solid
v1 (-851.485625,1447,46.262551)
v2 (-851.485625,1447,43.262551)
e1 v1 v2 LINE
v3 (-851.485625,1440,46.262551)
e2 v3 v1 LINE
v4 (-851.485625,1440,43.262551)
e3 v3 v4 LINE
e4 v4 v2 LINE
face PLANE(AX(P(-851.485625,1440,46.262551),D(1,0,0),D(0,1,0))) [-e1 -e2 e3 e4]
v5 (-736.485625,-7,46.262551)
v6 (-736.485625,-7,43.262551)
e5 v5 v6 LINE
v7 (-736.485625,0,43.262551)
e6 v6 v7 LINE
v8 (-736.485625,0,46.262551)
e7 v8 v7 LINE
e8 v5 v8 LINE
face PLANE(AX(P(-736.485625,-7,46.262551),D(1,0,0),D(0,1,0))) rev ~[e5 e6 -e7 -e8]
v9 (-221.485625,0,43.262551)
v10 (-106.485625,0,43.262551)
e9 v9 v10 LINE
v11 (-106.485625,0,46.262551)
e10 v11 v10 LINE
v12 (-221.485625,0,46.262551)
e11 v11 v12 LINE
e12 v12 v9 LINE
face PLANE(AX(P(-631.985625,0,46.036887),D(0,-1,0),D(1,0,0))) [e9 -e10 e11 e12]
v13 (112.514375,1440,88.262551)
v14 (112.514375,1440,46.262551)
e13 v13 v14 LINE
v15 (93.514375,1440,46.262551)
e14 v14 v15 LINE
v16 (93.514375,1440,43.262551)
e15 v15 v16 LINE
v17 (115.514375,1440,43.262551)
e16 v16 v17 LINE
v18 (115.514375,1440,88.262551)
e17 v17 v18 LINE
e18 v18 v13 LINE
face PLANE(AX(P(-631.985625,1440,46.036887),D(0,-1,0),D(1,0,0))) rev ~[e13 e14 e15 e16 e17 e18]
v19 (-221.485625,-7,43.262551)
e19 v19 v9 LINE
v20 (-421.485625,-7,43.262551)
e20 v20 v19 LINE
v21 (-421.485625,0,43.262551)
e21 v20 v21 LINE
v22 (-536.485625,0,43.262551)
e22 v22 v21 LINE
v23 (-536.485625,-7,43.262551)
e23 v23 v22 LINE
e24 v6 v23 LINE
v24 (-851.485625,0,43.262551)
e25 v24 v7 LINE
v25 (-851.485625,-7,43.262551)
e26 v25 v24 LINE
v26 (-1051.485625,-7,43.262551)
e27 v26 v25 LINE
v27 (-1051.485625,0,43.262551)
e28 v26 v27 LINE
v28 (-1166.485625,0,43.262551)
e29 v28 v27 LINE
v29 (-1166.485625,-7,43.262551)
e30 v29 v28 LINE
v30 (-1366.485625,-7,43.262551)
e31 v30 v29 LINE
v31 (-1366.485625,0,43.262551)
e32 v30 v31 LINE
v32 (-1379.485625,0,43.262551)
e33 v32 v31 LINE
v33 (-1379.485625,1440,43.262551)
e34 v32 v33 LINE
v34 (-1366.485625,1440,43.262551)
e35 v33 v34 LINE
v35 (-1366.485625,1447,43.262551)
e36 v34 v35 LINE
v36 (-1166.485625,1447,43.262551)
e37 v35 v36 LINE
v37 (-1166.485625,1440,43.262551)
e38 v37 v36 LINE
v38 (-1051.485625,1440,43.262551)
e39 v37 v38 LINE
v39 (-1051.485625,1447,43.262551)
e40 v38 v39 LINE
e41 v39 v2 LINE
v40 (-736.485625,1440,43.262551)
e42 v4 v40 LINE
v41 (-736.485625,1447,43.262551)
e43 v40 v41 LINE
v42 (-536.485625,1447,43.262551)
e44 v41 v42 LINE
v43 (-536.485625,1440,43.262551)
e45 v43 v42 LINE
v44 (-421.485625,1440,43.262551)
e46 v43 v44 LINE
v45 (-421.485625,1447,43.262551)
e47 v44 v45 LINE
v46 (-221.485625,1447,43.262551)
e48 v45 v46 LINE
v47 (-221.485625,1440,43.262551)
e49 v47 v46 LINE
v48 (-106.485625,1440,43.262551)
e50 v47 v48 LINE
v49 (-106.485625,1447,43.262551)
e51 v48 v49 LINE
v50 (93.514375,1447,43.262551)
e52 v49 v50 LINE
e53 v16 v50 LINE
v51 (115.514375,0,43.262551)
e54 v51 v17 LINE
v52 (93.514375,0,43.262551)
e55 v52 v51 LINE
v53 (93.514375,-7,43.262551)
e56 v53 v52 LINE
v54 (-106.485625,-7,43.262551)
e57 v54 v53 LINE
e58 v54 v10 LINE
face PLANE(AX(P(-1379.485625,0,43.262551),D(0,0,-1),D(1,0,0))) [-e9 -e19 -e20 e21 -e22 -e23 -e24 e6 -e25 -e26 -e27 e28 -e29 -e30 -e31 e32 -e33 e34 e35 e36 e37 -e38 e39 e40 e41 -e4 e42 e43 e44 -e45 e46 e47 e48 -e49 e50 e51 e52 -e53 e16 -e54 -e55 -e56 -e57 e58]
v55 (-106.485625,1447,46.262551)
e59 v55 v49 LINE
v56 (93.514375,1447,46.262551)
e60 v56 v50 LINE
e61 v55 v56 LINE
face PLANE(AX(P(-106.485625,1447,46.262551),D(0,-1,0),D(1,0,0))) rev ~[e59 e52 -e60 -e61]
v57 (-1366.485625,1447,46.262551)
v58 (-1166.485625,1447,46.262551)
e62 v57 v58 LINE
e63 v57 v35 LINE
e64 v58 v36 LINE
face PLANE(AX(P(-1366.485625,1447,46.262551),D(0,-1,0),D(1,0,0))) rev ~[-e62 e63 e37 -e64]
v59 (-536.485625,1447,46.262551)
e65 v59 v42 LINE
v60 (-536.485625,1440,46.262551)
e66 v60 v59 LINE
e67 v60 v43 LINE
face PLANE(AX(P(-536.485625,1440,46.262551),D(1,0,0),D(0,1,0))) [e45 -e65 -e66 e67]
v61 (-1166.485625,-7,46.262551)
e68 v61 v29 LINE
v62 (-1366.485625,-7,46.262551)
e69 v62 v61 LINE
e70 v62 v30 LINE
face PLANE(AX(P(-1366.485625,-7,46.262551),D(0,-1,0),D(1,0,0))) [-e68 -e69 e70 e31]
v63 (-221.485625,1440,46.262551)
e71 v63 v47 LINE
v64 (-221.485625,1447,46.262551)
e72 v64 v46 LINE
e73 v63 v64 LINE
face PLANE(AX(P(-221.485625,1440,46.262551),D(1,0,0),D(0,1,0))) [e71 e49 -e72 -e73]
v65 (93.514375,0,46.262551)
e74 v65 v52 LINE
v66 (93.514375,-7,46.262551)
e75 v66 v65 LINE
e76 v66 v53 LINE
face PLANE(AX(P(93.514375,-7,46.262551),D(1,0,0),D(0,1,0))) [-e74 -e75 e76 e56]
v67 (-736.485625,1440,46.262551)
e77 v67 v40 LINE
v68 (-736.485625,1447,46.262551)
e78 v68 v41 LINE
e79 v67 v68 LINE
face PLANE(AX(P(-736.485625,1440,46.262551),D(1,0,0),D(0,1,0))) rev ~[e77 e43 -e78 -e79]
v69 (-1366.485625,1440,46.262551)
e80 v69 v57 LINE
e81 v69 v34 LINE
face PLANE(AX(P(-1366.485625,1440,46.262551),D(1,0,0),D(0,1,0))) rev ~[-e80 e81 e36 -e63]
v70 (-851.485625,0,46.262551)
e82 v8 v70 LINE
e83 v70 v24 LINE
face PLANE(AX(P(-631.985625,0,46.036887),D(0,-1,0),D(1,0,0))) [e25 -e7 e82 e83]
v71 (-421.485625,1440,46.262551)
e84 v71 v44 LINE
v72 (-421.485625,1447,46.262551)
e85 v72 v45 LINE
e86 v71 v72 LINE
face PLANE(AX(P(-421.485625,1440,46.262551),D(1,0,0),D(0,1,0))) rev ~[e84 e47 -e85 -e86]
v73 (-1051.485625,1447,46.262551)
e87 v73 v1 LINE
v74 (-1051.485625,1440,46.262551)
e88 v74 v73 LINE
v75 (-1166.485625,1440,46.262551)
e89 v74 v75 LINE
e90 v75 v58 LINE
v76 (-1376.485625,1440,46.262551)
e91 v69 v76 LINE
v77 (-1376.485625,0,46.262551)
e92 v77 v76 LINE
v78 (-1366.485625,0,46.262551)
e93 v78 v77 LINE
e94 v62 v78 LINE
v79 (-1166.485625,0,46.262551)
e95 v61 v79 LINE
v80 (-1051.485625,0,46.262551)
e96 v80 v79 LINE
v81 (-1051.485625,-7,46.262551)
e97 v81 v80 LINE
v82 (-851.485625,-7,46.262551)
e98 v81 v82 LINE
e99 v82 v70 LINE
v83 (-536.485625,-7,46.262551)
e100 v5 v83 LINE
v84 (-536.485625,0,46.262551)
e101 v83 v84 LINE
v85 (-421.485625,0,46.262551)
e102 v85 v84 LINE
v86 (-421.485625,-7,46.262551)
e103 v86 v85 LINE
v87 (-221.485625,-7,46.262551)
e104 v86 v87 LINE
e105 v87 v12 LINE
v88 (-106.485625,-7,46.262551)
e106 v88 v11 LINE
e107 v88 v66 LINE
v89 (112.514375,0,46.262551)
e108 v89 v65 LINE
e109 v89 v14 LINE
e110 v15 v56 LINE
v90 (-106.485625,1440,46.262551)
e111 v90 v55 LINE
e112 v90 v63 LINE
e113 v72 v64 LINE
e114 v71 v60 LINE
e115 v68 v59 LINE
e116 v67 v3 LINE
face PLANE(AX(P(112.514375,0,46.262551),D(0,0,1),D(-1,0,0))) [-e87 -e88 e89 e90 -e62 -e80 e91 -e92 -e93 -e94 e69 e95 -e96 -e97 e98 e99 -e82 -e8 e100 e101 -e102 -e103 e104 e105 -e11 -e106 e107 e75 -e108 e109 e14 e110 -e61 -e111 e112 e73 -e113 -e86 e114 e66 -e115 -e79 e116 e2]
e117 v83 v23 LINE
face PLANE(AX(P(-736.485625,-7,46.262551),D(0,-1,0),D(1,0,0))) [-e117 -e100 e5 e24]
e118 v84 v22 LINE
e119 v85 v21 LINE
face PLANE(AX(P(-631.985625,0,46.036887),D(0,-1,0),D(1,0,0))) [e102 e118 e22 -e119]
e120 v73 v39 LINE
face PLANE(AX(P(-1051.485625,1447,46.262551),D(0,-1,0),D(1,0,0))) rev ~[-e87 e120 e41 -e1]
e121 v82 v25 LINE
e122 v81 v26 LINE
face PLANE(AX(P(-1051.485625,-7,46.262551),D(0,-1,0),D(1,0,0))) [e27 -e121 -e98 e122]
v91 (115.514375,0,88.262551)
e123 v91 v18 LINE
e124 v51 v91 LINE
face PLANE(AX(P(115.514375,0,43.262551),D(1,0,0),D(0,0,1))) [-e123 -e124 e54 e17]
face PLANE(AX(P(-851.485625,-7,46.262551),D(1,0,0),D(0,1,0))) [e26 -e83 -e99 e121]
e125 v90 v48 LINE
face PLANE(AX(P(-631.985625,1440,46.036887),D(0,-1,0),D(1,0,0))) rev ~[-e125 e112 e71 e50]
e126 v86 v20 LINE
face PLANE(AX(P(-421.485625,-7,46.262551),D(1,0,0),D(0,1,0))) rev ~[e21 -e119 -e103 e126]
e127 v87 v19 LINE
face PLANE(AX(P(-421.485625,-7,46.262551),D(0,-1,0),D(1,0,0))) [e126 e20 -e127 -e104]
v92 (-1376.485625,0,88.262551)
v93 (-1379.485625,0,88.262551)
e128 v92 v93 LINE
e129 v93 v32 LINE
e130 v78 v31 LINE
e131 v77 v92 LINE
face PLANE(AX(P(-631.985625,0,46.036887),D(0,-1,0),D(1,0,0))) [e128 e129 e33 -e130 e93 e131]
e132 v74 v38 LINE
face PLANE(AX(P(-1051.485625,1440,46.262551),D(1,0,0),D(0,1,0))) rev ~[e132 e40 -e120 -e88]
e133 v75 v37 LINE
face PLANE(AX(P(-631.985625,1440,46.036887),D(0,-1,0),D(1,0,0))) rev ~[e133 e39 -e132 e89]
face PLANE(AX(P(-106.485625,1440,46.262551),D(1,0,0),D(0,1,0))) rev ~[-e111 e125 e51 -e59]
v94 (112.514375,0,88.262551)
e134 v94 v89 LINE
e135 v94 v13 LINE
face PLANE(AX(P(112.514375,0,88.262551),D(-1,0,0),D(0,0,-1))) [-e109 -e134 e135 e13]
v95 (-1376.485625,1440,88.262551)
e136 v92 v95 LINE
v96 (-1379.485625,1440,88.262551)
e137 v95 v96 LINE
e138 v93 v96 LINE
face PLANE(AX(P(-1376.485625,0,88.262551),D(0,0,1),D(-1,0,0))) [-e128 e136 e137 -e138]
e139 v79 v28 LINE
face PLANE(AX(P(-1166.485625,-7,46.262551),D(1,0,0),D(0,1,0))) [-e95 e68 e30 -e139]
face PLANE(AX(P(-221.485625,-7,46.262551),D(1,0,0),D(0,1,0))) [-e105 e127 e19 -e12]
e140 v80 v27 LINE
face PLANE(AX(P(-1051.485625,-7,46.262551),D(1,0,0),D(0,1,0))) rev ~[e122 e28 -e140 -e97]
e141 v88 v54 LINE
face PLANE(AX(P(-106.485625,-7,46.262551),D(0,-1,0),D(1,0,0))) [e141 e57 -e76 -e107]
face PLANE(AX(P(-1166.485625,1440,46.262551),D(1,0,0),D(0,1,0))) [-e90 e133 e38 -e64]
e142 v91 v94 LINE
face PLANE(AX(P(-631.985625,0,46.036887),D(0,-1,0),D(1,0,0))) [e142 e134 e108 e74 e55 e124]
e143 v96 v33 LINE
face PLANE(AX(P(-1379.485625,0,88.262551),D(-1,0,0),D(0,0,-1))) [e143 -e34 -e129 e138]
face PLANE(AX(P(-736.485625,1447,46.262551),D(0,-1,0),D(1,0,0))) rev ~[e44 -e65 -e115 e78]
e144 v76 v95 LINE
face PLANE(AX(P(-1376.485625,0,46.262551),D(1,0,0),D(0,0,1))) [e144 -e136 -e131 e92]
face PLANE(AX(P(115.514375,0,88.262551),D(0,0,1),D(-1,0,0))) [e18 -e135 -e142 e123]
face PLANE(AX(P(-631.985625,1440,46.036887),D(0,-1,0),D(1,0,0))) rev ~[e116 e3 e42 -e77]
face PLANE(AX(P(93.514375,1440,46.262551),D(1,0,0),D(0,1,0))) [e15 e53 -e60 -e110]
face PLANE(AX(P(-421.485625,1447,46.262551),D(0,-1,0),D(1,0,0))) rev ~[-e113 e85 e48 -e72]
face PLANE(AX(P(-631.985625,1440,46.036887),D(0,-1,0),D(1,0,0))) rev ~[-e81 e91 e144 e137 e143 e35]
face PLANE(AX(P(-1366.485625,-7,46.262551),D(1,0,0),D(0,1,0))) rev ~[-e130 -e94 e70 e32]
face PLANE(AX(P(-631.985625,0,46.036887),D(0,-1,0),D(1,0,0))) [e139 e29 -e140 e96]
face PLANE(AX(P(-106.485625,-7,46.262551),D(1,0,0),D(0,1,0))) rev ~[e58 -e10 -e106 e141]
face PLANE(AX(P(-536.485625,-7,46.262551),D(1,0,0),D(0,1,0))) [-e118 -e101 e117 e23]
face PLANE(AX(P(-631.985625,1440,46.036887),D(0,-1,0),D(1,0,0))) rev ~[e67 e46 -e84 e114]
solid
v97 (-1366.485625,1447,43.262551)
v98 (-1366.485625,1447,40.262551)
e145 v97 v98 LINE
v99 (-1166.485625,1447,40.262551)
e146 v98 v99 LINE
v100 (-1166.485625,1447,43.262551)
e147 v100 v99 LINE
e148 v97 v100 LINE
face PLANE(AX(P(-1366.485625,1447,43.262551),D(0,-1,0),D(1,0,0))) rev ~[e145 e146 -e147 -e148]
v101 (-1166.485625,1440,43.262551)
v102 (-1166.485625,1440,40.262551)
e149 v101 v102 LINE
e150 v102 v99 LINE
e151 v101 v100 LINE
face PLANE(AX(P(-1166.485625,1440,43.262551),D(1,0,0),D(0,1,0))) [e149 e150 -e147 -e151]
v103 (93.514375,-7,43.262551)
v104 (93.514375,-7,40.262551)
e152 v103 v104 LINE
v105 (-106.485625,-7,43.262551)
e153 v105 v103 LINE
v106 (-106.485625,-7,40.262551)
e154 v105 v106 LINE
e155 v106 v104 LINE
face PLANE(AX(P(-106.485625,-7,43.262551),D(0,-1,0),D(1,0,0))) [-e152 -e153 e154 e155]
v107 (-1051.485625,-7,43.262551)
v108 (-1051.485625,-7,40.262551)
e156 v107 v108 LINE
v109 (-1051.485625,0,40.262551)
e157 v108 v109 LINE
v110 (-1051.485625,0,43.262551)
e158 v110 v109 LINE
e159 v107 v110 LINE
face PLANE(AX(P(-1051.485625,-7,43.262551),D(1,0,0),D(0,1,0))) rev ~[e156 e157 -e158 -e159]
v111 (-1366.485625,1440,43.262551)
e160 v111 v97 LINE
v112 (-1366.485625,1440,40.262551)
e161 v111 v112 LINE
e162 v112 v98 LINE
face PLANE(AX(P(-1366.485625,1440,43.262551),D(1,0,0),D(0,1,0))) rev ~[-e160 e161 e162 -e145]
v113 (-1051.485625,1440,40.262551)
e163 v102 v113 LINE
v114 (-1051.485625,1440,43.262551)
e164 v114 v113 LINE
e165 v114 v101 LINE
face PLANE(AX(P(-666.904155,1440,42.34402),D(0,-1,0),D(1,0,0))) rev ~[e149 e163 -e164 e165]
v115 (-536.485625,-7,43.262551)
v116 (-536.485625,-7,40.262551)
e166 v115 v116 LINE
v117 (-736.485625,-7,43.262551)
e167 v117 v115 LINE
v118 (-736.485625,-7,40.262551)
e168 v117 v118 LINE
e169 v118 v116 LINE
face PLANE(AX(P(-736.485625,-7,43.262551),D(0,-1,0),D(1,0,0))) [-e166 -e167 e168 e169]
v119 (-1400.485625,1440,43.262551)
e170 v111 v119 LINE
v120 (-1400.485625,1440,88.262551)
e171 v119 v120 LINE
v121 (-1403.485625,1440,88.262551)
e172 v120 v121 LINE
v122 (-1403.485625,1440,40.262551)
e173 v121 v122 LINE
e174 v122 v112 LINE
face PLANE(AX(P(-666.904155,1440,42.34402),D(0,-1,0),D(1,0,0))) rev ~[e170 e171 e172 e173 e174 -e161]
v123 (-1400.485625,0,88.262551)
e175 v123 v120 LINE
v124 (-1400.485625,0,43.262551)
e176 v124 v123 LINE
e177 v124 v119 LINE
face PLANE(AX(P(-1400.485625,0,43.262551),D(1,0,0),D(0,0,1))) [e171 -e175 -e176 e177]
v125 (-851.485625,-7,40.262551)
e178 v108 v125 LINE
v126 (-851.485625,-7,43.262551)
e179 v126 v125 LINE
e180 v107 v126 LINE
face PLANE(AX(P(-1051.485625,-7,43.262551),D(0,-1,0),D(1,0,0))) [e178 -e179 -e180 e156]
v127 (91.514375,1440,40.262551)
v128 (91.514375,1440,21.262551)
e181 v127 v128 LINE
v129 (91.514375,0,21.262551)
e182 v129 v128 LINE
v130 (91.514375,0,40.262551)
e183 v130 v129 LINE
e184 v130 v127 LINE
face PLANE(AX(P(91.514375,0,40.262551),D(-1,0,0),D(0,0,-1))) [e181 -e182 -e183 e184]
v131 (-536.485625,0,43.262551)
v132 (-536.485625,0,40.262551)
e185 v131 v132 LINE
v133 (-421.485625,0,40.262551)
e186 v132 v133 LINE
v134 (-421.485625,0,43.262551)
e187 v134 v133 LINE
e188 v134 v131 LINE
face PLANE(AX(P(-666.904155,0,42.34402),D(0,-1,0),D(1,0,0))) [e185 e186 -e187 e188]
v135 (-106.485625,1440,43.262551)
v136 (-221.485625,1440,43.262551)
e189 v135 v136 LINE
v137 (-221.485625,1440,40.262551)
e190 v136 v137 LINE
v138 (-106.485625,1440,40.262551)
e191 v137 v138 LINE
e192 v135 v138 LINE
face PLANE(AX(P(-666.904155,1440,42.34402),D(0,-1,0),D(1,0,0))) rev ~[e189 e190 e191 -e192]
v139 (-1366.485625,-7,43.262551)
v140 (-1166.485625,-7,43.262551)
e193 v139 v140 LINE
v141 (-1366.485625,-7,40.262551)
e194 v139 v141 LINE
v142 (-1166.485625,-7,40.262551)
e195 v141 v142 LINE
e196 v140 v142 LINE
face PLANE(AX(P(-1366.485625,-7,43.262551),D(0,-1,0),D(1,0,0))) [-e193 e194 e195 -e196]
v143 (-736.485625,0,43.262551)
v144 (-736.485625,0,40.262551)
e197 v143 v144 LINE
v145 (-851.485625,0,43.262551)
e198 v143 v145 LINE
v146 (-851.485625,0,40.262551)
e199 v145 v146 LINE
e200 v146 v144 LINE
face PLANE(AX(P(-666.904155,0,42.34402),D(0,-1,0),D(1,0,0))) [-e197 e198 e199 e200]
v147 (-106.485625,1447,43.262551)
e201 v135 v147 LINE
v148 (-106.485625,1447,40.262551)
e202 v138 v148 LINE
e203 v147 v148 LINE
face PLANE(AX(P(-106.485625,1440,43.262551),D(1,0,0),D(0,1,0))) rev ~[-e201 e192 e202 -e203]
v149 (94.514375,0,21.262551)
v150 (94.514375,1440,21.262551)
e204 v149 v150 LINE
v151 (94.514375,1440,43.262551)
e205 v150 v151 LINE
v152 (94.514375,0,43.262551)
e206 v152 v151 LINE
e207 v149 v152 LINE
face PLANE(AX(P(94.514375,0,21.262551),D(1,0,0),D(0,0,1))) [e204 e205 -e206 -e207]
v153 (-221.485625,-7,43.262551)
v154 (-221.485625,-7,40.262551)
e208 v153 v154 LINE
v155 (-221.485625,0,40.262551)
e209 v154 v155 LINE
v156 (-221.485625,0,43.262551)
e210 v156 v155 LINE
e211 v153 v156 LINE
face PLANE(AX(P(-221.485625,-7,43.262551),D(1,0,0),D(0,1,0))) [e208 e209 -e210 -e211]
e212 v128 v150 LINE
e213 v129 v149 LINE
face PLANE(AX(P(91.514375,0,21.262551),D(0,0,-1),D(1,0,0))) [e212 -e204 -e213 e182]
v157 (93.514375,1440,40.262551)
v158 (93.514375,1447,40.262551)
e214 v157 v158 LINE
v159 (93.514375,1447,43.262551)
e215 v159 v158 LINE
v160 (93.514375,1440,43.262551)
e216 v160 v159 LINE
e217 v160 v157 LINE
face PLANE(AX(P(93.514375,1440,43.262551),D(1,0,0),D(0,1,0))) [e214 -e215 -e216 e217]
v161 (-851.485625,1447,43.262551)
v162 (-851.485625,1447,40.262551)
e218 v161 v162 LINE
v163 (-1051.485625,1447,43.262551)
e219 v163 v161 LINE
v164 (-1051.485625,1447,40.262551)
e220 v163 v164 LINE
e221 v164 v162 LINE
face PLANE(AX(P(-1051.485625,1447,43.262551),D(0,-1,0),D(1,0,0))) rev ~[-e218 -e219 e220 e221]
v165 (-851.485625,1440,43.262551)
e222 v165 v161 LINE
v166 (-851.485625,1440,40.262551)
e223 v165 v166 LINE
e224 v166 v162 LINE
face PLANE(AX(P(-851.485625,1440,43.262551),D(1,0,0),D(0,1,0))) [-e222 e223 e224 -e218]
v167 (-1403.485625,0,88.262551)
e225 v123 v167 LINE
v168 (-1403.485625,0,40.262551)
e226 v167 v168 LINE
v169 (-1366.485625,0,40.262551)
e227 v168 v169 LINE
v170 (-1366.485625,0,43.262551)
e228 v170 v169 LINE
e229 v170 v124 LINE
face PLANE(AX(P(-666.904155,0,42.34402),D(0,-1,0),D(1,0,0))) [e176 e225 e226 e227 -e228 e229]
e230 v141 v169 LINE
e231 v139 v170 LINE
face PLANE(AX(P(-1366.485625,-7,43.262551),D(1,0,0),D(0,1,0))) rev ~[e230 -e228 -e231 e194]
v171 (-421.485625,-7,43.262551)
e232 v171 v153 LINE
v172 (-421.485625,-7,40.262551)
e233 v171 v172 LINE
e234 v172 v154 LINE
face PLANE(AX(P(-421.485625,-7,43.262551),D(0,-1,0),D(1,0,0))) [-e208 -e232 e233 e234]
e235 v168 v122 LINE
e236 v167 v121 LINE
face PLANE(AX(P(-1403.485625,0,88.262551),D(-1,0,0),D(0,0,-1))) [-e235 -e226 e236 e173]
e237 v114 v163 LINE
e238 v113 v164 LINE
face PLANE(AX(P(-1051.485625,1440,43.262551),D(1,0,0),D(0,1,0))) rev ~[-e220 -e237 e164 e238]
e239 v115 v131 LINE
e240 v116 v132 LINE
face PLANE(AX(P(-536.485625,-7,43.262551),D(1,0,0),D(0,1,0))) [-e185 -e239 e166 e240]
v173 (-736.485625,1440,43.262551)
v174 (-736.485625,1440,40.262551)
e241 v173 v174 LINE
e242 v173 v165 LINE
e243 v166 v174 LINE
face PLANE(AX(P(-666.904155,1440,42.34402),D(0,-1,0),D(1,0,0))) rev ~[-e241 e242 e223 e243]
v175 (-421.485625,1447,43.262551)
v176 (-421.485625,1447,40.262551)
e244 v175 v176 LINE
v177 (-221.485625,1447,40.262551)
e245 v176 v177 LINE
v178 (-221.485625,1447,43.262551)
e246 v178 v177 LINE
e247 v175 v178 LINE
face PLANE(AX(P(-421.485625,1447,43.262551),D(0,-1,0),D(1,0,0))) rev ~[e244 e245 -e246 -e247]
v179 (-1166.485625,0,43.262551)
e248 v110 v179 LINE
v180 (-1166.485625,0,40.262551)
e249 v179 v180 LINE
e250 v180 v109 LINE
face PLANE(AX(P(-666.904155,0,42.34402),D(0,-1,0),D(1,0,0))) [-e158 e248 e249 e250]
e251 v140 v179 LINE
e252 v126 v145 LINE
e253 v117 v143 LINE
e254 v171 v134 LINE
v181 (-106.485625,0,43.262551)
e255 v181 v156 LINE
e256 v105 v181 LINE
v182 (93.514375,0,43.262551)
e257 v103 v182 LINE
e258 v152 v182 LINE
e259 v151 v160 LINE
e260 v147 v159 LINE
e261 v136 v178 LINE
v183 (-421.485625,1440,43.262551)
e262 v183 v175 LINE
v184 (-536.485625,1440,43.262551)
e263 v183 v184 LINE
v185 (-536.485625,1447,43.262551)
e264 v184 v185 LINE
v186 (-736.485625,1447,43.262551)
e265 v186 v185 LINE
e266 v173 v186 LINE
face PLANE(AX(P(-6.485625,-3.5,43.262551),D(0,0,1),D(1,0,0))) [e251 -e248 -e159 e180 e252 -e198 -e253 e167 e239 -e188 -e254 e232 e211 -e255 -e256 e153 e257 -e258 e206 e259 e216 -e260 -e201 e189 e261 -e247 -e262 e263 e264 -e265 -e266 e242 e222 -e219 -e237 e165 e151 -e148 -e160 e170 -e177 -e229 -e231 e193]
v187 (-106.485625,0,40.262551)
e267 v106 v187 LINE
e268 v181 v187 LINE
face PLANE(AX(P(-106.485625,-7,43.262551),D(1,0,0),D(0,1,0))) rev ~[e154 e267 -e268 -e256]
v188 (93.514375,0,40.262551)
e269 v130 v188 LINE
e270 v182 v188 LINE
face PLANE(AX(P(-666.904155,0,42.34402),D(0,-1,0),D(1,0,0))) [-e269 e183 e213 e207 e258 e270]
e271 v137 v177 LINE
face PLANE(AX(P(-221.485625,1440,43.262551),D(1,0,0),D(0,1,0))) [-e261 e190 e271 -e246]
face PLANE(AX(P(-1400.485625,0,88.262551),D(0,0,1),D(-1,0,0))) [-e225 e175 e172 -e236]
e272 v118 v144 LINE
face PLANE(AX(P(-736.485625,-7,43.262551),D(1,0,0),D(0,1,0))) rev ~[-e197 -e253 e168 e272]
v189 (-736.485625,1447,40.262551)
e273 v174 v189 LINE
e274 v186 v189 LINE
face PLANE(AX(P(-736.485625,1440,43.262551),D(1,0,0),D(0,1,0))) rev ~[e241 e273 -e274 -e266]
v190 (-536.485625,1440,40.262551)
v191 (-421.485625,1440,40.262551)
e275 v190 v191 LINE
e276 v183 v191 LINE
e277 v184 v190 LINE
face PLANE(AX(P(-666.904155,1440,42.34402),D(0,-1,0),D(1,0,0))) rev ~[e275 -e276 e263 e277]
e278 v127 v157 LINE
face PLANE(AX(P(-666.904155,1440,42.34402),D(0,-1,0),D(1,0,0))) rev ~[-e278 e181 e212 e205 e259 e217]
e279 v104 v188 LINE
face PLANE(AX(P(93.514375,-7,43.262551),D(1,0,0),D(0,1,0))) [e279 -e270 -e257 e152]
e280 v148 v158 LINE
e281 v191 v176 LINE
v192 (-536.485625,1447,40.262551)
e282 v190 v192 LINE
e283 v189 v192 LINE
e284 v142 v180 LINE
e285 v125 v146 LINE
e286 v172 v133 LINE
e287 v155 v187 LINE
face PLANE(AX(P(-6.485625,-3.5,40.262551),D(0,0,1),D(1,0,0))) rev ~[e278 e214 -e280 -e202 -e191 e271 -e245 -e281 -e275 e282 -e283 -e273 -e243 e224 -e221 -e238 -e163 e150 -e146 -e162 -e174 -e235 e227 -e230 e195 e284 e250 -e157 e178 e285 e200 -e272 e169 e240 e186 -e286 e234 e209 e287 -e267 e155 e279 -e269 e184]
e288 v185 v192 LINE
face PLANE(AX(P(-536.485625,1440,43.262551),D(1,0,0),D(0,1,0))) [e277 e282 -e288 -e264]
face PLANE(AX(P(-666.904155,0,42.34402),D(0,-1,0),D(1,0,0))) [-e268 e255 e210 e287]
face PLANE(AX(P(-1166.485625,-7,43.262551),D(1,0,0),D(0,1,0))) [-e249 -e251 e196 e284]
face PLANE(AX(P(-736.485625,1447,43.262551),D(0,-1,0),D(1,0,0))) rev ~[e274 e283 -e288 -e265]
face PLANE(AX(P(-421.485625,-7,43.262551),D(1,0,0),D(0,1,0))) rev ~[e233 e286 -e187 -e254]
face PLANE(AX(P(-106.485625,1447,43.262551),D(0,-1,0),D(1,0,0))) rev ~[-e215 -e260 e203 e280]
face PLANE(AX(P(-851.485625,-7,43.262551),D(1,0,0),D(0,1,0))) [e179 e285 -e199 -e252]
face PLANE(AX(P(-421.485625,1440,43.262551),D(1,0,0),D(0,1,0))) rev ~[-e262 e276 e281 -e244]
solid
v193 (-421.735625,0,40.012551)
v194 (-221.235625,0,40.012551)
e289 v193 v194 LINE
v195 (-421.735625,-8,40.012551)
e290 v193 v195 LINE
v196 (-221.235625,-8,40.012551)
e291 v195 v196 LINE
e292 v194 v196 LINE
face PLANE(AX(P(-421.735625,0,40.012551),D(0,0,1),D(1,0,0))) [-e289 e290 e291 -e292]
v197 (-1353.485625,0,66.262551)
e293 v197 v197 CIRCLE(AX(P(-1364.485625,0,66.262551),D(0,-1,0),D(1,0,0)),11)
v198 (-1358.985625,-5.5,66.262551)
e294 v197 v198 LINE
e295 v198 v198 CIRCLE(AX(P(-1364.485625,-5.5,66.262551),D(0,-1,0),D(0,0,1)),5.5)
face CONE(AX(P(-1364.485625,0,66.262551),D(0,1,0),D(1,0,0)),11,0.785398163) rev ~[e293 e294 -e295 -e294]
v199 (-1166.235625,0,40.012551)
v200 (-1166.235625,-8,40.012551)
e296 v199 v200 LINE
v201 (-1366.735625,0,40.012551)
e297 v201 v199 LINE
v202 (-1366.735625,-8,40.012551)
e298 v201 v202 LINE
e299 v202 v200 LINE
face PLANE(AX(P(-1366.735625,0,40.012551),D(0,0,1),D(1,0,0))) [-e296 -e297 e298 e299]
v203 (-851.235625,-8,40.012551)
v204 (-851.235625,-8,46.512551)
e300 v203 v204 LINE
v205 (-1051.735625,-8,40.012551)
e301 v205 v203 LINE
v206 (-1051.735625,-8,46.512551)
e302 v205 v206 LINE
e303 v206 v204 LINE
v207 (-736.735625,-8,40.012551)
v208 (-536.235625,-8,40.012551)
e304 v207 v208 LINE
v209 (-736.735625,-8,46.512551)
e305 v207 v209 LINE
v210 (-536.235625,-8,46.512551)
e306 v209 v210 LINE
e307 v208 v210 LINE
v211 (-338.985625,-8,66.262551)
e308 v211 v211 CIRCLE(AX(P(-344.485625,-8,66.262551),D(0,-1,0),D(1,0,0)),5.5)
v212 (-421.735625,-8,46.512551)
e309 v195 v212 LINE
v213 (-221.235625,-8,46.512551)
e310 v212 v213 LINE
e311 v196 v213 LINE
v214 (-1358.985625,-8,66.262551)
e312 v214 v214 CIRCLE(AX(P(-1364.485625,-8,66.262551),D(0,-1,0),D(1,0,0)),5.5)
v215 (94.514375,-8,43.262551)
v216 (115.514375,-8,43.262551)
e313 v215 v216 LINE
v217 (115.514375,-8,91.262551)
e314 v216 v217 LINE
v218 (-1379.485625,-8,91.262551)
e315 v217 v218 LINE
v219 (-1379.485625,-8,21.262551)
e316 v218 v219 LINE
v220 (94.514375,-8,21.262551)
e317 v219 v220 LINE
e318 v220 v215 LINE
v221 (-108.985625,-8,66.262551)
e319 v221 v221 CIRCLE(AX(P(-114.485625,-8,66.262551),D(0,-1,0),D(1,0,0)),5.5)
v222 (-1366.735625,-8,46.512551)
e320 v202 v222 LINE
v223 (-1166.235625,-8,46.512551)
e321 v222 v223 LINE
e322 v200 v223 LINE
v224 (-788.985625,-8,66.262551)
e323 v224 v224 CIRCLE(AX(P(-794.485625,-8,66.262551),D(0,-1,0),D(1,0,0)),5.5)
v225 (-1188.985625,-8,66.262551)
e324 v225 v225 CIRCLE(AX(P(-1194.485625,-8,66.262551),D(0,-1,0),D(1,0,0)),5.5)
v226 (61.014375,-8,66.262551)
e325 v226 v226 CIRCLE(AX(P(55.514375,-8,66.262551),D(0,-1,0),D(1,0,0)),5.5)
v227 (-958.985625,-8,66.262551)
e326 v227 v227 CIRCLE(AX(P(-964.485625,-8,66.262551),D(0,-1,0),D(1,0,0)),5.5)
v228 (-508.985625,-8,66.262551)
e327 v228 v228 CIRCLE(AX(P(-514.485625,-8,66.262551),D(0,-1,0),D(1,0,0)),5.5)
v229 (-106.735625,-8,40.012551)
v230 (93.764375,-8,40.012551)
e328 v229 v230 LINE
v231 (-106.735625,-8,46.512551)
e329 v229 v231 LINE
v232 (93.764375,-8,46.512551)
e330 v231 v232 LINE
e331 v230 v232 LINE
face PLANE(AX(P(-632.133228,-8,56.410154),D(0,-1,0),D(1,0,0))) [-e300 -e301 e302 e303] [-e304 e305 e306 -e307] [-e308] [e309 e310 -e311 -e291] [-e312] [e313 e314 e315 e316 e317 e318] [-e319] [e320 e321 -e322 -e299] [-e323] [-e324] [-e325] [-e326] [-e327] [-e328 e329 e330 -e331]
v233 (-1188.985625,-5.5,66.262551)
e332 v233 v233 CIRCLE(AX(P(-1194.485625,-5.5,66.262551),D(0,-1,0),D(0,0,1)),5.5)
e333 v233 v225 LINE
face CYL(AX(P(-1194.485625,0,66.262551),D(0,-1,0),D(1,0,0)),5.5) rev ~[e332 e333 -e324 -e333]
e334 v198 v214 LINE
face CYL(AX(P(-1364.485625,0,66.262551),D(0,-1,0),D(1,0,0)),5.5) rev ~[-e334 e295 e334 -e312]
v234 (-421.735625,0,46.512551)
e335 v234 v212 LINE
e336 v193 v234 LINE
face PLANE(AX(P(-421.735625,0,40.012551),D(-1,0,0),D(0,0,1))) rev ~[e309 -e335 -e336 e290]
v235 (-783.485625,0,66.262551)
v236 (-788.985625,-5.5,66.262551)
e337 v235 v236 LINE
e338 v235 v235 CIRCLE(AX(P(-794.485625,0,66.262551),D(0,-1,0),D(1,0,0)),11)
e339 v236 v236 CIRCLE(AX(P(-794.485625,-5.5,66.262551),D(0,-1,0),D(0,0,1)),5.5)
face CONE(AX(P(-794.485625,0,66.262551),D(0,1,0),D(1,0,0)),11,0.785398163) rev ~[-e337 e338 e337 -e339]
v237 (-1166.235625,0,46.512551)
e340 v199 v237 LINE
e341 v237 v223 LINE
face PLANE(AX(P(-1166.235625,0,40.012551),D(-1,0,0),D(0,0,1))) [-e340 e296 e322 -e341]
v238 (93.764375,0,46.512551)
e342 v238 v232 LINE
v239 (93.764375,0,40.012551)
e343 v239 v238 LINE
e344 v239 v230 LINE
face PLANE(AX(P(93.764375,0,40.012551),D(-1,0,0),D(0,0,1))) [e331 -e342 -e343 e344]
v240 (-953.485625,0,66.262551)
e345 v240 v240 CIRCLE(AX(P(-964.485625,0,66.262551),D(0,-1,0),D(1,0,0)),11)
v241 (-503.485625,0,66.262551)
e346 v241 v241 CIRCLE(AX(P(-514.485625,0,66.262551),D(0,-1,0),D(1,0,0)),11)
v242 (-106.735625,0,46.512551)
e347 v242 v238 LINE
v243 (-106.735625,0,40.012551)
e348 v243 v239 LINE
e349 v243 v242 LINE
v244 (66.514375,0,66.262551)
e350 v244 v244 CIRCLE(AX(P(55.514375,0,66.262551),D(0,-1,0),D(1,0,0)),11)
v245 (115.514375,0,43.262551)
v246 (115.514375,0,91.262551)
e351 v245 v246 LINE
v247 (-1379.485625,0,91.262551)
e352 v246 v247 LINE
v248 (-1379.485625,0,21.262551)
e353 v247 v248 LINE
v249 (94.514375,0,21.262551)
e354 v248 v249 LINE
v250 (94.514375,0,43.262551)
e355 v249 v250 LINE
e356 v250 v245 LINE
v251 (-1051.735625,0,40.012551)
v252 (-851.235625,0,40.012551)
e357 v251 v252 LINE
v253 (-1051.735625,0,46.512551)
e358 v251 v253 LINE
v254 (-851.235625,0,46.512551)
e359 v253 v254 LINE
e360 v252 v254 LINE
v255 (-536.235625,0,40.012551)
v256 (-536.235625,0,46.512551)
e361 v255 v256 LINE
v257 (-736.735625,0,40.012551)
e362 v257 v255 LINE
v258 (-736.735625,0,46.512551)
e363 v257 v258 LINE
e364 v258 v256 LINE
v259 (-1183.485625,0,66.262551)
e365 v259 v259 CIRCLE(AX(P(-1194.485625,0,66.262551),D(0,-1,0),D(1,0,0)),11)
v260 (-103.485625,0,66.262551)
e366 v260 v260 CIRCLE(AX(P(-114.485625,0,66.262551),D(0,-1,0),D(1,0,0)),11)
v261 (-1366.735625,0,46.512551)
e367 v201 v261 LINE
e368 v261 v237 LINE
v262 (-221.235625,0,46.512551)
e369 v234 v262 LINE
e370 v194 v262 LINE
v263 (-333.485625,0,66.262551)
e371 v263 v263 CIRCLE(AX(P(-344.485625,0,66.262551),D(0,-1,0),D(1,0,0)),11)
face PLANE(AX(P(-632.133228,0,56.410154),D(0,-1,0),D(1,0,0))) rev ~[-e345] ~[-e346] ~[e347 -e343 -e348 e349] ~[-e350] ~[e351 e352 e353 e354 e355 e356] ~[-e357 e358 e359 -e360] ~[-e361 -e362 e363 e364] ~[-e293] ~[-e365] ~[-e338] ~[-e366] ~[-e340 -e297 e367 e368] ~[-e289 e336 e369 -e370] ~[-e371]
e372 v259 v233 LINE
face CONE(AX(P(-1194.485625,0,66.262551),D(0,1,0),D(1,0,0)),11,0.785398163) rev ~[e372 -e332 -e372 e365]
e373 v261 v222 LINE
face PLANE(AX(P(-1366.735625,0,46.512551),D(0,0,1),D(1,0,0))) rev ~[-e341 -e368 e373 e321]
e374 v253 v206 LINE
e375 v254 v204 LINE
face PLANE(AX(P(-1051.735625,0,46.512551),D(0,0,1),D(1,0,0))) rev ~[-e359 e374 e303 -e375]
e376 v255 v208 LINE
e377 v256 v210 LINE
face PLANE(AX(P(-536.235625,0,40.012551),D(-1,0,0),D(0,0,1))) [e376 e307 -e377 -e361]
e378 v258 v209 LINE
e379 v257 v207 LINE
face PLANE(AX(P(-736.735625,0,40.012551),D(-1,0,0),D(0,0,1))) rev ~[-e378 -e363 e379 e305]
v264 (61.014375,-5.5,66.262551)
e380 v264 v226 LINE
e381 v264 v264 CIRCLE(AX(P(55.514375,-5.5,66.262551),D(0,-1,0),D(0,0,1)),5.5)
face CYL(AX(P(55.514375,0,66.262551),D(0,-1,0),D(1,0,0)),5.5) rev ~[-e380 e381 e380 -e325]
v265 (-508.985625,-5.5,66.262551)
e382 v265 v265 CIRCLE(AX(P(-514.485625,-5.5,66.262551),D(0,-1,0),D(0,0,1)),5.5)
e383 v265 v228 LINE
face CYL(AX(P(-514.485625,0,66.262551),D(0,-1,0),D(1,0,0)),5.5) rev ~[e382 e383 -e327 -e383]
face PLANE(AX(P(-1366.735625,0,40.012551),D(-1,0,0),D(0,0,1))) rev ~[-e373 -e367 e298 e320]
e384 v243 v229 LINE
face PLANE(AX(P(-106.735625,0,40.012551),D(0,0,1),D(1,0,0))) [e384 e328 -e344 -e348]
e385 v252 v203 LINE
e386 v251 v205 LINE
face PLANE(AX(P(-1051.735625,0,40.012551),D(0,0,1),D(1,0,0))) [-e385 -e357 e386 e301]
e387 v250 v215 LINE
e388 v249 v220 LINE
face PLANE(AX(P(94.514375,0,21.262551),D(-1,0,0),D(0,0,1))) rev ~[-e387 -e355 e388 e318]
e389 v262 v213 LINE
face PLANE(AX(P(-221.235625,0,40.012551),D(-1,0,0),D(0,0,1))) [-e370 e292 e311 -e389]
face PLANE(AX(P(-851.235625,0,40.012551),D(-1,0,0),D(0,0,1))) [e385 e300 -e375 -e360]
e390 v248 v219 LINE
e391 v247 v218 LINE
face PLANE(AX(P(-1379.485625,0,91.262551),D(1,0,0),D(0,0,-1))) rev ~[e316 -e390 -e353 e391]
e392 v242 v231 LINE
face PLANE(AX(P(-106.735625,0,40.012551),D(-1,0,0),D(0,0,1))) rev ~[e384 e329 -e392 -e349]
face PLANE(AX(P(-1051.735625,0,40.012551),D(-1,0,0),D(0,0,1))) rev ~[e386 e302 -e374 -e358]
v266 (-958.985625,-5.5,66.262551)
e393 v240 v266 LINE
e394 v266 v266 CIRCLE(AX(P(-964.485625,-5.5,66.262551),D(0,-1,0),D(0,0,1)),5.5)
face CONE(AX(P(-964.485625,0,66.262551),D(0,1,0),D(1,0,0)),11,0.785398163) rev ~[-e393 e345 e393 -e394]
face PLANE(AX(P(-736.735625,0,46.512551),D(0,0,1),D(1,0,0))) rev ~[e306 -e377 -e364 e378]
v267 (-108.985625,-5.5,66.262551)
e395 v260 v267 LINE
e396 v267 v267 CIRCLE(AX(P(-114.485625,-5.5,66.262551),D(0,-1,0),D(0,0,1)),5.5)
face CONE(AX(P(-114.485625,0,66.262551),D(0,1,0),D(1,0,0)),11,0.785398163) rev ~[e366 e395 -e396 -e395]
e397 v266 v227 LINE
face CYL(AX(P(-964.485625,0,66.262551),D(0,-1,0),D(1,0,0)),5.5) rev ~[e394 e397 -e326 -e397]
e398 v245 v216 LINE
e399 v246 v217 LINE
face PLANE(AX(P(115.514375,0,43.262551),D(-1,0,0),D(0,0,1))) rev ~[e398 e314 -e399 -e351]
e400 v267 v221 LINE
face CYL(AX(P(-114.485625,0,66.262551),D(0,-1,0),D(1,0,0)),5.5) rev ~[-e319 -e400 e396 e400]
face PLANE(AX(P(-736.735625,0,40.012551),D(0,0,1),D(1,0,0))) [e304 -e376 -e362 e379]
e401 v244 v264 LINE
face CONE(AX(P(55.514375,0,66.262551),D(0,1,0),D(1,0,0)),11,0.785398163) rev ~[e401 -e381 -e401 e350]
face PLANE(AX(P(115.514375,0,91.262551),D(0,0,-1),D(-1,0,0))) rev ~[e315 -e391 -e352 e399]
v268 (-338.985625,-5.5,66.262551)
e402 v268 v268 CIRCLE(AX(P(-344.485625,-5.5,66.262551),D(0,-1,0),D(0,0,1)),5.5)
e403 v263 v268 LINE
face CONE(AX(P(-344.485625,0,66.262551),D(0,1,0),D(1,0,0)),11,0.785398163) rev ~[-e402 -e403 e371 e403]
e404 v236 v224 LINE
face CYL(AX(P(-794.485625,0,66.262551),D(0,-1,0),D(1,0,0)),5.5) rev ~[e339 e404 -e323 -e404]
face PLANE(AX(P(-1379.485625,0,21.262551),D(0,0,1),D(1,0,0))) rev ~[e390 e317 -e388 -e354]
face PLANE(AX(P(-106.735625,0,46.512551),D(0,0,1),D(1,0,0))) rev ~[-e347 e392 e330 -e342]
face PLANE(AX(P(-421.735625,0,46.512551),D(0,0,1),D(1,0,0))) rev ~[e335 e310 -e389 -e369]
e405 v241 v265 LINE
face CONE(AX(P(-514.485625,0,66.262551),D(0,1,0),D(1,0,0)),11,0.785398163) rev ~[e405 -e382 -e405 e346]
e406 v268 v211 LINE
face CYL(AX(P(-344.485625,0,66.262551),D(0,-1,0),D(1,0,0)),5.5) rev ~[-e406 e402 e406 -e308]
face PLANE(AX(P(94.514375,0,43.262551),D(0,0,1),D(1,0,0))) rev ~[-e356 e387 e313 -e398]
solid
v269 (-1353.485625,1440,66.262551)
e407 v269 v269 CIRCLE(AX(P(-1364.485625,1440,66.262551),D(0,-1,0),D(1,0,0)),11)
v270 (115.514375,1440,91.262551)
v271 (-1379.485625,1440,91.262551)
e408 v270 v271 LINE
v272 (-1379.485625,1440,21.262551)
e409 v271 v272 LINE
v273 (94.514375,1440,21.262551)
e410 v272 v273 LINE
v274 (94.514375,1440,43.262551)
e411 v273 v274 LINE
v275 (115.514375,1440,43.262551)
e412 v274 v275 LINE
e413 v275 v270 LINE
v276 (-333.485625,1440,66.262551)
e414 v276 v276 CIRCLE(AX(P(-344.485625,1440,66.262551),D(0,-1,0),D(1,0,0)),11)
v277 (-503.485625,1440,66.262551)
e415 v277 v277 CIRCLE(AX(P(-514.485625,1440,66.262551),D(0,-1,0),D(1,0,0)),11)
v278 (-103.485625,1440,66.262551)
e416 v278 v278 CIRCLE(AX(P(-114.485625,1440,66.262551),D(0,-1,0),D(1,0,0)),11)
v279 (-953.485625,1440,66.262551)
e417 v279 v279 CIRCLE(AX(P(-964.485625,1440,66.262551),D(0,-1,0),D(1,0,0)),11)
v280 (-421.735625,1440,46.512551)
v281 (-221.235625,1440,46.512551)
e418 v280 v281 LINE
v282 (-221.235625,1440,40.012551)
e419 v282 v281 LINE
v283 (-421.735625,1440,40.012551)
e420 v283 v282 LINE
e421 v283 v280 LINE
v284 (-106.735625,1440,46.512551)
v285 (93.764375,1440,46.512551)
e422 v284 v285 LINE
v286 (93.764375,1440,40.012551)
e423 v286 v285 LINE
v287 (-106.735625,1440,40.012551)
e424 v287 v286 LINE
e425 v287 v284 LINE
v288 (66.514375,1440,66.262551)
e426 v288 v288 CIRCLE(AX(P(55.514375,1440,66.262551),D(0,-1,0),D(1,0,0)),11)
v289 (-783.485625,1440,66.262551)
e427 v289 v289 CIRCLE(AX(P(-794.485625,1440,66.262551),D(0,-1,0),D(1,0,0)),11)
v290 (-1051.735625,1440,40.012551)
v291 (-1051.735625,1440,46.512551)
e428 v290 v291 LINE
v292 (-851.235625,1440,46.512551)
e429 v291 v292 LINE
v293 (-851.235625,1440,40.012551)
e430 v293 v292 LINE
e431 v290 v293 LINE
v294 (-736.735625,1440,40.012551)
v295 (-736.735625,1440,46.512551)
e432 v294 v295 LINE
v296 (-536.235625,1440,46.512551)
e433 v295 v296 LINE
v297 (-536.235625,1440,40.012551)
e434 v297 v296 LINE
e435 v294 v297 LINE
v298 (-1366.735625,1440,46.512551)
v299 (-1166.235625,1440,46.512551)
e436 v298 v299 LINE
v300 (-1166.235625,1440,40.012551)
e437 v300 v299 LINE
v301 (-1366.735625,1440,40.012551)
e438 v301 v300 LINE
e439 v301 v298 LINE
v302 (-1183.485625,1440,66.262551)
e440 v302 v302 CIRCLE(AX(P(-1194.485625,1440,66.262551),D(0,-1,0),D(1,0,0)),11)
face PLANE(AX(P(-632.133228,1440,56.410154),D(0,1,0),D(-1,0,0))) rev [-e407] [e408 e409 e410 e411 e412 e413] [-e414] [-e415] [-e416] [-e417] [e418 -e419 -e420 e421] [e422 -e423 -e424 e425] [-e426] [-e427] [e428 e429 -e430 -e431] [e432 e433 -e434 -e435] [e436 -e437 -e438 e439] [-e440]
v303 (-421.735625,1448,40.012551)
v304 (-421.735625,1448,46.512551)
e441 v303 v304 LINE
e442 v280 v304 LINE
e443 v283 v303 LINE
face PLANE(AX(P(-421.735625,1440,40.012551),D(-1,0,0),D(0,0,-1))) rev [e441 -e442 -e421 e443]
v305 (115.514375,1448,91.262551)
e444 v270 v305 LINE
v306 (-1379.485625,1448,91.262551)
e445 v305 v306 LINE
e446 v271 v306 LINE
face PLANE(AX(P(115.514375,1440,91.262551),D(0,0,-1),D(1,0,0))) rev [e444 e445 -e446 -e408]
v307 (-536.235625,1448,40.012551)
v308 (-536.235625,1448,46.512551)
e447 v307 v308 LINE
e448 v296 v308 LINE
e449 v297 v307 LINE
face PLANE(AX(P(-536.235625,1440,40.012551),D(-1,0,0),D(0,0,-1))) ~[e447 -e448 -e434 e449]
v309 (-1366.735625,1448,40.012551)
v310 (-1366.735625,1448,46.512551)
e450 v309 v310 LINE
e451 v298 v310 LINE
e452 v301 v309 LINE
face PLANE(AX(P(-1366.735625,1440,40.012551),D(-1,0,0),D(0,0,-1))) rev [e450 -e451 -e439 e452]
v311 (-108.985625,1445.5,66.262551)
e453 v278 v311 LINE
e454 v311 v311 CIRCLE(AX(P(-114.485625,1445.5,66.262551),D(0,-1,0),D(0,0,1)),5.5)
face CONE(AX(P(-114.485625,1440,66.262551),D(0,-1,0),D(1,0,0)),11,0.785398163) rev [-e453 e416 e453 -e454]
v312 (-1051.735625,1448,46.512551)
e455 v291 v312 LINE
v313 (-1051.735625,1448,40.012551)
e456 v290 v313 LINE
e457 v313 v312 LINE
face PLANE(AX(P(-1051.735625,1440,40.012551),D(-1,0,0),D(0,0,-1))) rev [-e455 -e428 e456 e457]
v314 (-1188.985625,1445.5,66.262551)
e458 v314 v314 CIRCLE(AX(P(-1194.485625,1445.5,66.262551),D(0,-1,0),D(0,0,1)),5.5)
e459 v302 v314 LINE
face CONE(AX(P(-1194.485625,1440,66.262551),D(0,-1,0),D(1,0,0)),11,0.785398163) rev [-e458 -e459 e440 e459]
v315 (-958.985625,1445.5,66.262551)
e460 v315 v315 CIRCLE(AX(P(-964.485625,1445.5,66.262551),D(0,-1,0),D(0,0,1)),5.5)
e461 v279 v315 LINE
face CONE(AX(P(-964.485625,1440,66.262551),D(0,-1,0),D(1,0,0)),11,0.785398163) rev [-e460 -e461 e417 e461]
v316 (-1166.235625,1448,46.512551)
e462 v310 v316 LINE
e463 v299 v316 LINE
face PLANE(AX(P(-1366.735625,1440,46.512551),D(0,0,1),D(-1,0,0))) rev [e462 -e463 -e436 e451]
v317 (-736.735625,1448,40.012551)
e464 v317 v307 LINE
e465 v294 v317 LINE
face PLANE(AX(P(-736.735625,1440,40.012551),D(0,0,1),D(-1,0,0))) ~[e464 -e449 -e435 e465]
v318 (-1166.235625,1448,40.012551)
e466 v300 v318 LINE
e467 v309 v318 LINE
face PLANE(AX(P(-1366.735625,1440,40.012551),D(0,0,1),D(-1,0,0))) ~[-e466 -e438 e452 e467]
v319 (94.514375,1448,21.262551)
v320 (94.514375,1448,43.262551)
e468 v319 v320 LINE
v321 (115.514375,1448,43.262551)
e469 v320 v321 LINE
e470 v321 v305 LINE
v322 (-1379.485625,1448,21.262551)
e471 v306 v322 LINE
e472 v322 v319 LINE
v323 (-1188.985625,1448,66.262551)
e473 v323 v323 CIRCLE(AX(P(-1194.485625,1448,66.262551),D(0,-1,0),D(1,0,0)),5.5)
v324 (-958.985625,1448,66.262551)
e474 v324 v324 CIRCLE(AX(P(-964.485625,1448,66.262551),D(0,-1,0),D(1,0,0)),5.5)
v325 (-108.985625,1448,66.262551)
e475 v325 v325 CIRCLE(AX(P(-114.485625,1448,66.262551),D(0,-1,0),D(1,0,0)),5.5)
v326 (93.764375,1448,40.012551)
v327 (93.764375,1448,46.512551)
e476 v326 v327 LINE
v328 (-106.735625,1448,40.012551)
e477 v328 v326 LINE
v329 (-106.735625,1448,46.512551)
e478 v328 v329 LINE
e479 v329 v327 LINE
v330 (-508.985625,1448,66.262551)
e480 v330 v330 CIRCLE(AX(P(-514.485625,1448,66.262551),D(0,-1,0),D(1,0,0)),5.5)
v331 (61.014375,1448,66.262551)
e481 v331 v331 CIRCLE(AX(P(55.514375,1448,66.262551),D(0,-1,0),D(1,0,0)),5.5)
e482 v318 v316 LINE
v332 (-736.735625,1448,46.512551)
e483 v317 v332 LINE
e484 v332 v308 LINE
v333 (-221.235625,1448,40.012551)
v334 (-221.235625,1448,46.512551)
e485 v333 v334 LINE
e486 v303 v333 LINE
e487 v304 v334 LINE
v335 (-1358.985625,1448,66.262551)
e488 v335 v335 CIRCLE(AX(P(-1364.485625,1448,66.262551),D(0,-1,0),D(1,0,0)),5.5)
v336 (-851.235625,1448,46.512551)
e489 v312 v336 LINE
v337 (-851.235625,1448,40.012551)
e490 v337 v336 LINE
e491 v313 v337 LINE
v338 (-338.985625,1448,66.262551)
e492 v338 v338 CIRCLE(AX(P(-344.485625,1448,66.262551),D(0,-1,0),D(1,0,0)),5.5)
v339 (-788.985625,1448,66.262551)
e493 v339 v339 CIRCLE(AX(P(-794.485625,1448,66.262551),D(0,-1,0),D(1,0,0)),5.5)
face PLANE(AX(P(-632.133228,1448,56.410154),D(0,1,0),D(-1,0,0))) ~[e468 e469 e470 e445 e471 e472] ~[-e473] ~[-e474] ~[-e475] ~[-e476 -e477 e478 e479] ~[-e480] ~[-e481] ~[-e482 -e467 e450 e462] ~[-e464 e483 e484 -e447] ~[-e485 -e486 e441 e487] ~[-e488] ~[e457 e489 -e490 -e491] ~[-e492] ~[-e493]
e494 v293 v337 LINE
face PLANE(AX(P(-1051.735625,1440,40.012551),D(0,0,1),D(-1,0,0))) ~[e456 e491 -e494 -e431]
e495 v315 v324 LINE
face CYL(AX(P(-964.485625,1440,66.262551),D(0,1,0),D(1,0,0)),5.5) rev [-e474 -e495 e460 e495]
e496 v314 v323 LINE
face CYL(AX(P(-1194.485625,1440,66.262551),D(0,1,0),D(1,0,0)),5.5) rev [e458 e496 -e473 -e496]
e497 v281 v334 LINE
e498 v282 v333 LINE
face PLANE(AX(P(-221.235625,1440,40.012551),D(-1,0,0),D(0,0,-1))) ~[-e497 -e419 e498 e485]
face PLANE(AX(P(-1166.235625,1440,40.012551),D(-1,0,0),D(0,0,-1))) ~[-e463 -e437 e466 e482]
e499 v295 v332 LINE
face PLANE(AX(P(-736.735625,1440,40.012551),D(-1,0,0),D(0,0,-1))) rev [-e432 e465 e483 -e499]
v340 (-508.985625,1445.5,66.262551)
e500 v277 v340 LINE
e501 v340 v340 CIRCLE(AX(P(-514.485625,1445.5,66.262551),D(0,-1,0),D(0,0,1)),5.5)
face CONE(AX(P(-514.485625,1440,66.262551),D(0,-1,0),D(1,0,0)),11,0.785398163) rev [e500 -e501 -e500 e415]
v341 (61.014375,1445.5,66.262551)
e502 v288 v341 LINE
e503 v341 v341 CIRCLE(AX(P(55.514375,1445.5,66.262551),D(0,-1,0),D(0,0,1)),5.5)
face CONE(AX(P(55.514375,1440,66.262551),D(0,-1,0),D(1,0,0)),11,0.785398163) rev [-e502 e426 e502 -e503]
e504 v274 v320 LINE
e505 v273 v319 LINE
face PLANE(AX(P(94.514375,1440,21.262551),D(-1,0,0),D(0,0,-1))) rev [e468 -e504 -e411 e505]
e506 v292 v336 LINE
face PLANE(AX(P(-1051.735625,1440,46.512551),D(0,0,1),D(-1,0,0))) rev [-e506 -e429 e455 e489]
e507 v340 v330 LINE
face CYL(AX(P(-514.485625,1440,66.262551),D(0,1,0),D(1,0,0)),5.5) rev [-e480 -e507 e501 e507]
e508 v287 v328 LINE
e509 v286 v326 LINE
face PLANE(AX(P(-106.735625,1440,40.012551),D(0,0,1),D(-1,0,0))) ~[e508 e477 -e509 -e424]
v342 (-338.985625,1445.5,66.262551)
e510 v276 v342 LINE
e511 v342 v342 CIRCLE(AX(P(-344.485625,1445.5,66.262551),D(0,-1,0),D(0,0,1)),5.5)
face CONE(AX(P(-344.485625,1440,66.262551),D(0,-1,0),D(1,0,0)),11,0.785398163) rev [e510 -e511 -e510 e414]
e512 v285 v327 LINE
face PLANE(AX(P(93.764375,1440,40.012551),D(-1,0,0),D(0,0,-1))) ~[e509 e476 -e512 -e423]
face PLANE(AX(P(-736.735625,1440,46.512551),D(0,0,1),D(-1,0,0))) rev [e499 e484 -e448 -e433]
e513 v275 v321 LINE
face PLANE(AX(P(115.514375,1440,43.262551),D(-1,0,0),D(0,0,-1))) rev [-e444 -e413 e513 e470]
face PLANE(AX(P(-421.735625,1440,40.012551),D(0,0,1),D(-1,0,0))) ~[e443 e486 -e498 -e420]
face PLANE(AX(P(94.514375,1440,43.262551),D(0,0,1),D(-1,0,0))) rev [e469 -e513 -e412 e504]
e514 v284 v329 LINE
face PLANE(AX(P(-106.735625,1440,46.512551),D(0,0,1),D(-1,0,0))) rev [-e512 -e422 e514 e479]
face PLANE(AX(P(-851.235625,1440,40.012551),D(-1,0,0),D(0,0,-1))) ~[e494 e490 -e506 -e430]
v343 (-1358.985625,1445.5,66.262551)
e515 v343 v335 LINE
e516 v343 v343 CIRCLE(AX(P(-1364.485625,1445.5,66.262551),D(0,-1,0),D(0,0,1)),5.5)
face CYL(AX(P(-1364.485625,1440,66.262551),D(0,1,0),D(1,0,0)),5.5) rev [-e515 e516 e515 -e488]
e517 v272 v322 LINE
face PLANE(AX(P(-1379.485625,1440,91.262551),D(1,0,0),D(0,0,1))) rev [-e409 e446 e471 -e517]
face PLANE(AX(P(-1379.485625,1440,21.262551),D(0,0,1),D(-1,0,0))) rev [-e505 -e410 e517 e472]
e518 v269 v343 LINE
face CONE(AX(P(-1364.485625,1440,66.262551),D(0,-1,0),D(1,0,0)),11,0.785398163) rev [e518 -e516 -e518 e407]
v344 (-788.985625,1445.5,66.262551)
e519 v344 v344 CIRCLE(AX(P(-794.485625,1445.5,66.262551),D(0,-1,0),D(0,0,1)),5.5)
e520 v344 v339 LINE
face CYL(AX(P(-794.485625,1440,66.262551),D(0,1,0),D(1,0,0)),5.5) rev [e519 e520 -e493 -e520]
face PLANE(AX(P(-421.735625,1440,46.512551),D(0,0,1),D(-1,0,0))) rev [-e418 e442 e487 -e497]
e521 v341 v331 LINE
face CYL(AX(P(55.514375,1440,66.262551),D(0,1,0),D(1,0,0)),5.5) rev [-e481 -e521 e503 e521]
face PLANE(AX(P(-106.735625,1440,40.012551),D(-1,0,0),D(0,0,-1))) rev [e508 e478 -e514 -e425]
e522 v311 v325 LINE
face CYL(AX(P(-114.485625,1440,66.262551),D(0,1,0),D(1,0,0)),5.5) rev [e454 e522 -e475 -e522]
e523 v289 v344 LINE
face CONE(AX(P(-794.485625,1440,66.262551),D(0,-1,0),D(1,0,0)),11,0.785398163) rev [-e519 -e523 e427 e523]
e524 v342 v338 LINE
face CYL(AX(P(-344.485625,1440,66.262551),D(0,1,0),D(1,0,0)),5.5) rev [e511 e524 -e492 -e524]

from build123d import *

# Parameters (mm, degrees)
F1_DEPTH        = 1440
F2_DEPTH        = 1440
F3_W            = 200
F3_H            = 7
F4_DEPTH        = 3
F5_W            = 200
F5_H            = 7
F6_DEPTH        = 3
F7_W            = 200.5
F7_H            = 6.5
F8_DEPTH        = 8
F11_D           = 11
F11_CSINK_D     = 22
F11_CSINK_ANGLE = 90


with BuildPart() as f1:
    # F0 (on Front) → F1 (new body)
    with BuildSketch(Plane.XZ):
        Polygon((-1400.4856245518, 88.2625505924), (-1403.4856245518, 88.2625505924), (-1403.4856245518, 40.2625505924), (91.5143754482, 40.2625505924), (91.5143754482, 21.2625505924), (94.5143754482, 21.2625505924), (94.5143754482, 43.2625505924), (-1379.4856245518, 43.2625505924), (-1400.4856245518, 43.2625505924), align=None)
    extrude(amount=-F1_DEPTH)

    # F3 (on face) → F4 (join)
    with BuildSketch(Plane.XY.offset(43.2625505924)):
        with Locations((-1266.4856245518, -3.5)):
            Rectangle(F3_W, F3_H)
        with Locations((-951.4856245518, -3.5)):
            Rectangle(F3_W, F3_H)
        with Locations((-636.4856245518, -3.5)):
            Rectangle(F3_W, F3_H)
        with Locations((-321.4856245518, -3.5)):
            Rectangle(F3_W, F3_H)
        with Locations((-6.4856245518, -3.5)):
            Rectangle(F3_W, F3_H)
        with Locations((-1266.4856245518, 1443.5)):
            Rectangle(F3_W, F3_H)
        with Locations((-951.4856245518, 1443.5)):
            Rectangle(F3_W, F3_H)
        with Locations((-321.4856245518, 1443.5)):
            Rectangle(F3_W, F3_H)
        with Locations((-6.4856245518, 1443.5)):
            Rectangle(F3_W, F3_H)
        with Locations((-636.4856245518, 1443.5)):
            Rectangle(F3_W, F3_H)
    extrude(amount=-F4_DEPTH)


with BuildPart() as f2:
    # F0 (on Front) → F2 (new body)
    with BuildSketch(Plane.XZ):
        Polygon((-1379.4856245518, 88.2625505924), (-1379.4856245518, 43.2625505924), (94.5143754482, 43.2625505924), (115.5143754482, 43.2625505924), (115.5143754482, 46.2625505924), (115.5143754482, 88.2625505924), (112.5143754482, 88.2625505924), (112.5143754482, 46.2625505924), (-1376.4856245518, 46.2625505924), (-1376.4856245518, 88.2625505924), align=None)
    extrude(amount=-F2_DEPTH)

    # F5 (on face) → F6 (join)
    with BuildSketch(Plane.XY.offset(46.2625505924)):
        with Locations((-1266.4856245518, -3.5)):
            Rectangle(F5_W, F5_H)
        with Locations((-951.4856245518, -3.5)):
            Rectangle(F5_W, F5_H)
        with Locations((-636.4856245518, -3.5)):
            Rectangle(F5_W, F5_H)
        with Locations((-321.4856245518, -3.5)):
            Rectangle(F5_W, F5_H)
        with Locations((-6.4856245518, -3.5)):
            Rectangle(F5_W, F5_H)
        with Locations((-951.4856245518, 1443.5)):
            Rectangle(F5_W, F5_H)
        with Locations((-1266.4856245518, 1443.5)):
            Rectangle(F5_W, F5_H)
        with Locations((-6.4856245518, 1443.5)):
            Rectangle(F5_W, F5_H)
        with Locations((-636.4856245518, 1443.5)):
            Rectangle(F5_W, F5_H)
        with Locations((-321.4856245518, 1443.5)):
            Rectangle(F5_W, F5_H)
    extrude(amount=-F6_DEPTH)


with BuildPart() as f8:
    # F7 (on face) → F8 (new body)
    with BuildSketch(Plane.XZ):
        Polygon((94.5143754482, 43.2625505924), (115.5143754482, 43.2625505924), (115.5143754482, 91.2625505924), (-1379.4856245518, 91.2625505924), (-1379.4856245518, 21.2625505924), (94.5143754482, 21.2625505924), align=None)
        with Locations((-1266.4856245518, 43.2625505924)):
            Rectangle(F7_W, F7_H, mode=Mode.SUBTRACT)
        with Locations((-951.4856245518, 43.2625505924)):
            Rectangle(F7_W, F7_H, mode=Mode.SUBTRACT)
        with Locations((-636.4856245518, 43.2625505924)):
            Rectangle(F7_W, F7_H, mode=Mode.SUBTRACT)
        with Locations((-321.4856245518, 43.2625505924)):
            Rectangle(F7_W, F7_H, mode=Mode.SUBTRACT)
        with Locations((-6.4856245518, 43.2625505924)):
            Rectangle(F7_W, F7_H, mode=Mode.SUBTRACT)
    extrude(amount=F8_DEPTH)

    # F11 (through all)
    with Locations(Plane(origin=(0, 0, 0), x_dir=(-1, 0, 0), z_dir=(0, 1, 0))):
        with Locations((1364.4856245518, 66.2625505924), (1194.4856245518, 66.2625505924), (964.4856245518, 66.2625505924), (794.4856245518, 66.2625505924), (514.4856245518, 66.2625505924), (344.4856245518, 66.2625505924), (114.4856245518, 66.2625505924), (-55.5143754482, 66.2625505924)):
            CounterSinkHole(F11_D / 2, F11_CSINK_D / 2, counter_sink_angle=F11_CSINK_ANGLE)


with BuildPart() as f12_1:
    # F12: instance of F8
    add(f8.part.mirror(Plane(origin=(0, 720, 0), x_dir=(-1, 0, 0), z_dir=(0, 1, 0))))


solid = Compound([f1.part, f2.part, f8.part, f12_1.part])
